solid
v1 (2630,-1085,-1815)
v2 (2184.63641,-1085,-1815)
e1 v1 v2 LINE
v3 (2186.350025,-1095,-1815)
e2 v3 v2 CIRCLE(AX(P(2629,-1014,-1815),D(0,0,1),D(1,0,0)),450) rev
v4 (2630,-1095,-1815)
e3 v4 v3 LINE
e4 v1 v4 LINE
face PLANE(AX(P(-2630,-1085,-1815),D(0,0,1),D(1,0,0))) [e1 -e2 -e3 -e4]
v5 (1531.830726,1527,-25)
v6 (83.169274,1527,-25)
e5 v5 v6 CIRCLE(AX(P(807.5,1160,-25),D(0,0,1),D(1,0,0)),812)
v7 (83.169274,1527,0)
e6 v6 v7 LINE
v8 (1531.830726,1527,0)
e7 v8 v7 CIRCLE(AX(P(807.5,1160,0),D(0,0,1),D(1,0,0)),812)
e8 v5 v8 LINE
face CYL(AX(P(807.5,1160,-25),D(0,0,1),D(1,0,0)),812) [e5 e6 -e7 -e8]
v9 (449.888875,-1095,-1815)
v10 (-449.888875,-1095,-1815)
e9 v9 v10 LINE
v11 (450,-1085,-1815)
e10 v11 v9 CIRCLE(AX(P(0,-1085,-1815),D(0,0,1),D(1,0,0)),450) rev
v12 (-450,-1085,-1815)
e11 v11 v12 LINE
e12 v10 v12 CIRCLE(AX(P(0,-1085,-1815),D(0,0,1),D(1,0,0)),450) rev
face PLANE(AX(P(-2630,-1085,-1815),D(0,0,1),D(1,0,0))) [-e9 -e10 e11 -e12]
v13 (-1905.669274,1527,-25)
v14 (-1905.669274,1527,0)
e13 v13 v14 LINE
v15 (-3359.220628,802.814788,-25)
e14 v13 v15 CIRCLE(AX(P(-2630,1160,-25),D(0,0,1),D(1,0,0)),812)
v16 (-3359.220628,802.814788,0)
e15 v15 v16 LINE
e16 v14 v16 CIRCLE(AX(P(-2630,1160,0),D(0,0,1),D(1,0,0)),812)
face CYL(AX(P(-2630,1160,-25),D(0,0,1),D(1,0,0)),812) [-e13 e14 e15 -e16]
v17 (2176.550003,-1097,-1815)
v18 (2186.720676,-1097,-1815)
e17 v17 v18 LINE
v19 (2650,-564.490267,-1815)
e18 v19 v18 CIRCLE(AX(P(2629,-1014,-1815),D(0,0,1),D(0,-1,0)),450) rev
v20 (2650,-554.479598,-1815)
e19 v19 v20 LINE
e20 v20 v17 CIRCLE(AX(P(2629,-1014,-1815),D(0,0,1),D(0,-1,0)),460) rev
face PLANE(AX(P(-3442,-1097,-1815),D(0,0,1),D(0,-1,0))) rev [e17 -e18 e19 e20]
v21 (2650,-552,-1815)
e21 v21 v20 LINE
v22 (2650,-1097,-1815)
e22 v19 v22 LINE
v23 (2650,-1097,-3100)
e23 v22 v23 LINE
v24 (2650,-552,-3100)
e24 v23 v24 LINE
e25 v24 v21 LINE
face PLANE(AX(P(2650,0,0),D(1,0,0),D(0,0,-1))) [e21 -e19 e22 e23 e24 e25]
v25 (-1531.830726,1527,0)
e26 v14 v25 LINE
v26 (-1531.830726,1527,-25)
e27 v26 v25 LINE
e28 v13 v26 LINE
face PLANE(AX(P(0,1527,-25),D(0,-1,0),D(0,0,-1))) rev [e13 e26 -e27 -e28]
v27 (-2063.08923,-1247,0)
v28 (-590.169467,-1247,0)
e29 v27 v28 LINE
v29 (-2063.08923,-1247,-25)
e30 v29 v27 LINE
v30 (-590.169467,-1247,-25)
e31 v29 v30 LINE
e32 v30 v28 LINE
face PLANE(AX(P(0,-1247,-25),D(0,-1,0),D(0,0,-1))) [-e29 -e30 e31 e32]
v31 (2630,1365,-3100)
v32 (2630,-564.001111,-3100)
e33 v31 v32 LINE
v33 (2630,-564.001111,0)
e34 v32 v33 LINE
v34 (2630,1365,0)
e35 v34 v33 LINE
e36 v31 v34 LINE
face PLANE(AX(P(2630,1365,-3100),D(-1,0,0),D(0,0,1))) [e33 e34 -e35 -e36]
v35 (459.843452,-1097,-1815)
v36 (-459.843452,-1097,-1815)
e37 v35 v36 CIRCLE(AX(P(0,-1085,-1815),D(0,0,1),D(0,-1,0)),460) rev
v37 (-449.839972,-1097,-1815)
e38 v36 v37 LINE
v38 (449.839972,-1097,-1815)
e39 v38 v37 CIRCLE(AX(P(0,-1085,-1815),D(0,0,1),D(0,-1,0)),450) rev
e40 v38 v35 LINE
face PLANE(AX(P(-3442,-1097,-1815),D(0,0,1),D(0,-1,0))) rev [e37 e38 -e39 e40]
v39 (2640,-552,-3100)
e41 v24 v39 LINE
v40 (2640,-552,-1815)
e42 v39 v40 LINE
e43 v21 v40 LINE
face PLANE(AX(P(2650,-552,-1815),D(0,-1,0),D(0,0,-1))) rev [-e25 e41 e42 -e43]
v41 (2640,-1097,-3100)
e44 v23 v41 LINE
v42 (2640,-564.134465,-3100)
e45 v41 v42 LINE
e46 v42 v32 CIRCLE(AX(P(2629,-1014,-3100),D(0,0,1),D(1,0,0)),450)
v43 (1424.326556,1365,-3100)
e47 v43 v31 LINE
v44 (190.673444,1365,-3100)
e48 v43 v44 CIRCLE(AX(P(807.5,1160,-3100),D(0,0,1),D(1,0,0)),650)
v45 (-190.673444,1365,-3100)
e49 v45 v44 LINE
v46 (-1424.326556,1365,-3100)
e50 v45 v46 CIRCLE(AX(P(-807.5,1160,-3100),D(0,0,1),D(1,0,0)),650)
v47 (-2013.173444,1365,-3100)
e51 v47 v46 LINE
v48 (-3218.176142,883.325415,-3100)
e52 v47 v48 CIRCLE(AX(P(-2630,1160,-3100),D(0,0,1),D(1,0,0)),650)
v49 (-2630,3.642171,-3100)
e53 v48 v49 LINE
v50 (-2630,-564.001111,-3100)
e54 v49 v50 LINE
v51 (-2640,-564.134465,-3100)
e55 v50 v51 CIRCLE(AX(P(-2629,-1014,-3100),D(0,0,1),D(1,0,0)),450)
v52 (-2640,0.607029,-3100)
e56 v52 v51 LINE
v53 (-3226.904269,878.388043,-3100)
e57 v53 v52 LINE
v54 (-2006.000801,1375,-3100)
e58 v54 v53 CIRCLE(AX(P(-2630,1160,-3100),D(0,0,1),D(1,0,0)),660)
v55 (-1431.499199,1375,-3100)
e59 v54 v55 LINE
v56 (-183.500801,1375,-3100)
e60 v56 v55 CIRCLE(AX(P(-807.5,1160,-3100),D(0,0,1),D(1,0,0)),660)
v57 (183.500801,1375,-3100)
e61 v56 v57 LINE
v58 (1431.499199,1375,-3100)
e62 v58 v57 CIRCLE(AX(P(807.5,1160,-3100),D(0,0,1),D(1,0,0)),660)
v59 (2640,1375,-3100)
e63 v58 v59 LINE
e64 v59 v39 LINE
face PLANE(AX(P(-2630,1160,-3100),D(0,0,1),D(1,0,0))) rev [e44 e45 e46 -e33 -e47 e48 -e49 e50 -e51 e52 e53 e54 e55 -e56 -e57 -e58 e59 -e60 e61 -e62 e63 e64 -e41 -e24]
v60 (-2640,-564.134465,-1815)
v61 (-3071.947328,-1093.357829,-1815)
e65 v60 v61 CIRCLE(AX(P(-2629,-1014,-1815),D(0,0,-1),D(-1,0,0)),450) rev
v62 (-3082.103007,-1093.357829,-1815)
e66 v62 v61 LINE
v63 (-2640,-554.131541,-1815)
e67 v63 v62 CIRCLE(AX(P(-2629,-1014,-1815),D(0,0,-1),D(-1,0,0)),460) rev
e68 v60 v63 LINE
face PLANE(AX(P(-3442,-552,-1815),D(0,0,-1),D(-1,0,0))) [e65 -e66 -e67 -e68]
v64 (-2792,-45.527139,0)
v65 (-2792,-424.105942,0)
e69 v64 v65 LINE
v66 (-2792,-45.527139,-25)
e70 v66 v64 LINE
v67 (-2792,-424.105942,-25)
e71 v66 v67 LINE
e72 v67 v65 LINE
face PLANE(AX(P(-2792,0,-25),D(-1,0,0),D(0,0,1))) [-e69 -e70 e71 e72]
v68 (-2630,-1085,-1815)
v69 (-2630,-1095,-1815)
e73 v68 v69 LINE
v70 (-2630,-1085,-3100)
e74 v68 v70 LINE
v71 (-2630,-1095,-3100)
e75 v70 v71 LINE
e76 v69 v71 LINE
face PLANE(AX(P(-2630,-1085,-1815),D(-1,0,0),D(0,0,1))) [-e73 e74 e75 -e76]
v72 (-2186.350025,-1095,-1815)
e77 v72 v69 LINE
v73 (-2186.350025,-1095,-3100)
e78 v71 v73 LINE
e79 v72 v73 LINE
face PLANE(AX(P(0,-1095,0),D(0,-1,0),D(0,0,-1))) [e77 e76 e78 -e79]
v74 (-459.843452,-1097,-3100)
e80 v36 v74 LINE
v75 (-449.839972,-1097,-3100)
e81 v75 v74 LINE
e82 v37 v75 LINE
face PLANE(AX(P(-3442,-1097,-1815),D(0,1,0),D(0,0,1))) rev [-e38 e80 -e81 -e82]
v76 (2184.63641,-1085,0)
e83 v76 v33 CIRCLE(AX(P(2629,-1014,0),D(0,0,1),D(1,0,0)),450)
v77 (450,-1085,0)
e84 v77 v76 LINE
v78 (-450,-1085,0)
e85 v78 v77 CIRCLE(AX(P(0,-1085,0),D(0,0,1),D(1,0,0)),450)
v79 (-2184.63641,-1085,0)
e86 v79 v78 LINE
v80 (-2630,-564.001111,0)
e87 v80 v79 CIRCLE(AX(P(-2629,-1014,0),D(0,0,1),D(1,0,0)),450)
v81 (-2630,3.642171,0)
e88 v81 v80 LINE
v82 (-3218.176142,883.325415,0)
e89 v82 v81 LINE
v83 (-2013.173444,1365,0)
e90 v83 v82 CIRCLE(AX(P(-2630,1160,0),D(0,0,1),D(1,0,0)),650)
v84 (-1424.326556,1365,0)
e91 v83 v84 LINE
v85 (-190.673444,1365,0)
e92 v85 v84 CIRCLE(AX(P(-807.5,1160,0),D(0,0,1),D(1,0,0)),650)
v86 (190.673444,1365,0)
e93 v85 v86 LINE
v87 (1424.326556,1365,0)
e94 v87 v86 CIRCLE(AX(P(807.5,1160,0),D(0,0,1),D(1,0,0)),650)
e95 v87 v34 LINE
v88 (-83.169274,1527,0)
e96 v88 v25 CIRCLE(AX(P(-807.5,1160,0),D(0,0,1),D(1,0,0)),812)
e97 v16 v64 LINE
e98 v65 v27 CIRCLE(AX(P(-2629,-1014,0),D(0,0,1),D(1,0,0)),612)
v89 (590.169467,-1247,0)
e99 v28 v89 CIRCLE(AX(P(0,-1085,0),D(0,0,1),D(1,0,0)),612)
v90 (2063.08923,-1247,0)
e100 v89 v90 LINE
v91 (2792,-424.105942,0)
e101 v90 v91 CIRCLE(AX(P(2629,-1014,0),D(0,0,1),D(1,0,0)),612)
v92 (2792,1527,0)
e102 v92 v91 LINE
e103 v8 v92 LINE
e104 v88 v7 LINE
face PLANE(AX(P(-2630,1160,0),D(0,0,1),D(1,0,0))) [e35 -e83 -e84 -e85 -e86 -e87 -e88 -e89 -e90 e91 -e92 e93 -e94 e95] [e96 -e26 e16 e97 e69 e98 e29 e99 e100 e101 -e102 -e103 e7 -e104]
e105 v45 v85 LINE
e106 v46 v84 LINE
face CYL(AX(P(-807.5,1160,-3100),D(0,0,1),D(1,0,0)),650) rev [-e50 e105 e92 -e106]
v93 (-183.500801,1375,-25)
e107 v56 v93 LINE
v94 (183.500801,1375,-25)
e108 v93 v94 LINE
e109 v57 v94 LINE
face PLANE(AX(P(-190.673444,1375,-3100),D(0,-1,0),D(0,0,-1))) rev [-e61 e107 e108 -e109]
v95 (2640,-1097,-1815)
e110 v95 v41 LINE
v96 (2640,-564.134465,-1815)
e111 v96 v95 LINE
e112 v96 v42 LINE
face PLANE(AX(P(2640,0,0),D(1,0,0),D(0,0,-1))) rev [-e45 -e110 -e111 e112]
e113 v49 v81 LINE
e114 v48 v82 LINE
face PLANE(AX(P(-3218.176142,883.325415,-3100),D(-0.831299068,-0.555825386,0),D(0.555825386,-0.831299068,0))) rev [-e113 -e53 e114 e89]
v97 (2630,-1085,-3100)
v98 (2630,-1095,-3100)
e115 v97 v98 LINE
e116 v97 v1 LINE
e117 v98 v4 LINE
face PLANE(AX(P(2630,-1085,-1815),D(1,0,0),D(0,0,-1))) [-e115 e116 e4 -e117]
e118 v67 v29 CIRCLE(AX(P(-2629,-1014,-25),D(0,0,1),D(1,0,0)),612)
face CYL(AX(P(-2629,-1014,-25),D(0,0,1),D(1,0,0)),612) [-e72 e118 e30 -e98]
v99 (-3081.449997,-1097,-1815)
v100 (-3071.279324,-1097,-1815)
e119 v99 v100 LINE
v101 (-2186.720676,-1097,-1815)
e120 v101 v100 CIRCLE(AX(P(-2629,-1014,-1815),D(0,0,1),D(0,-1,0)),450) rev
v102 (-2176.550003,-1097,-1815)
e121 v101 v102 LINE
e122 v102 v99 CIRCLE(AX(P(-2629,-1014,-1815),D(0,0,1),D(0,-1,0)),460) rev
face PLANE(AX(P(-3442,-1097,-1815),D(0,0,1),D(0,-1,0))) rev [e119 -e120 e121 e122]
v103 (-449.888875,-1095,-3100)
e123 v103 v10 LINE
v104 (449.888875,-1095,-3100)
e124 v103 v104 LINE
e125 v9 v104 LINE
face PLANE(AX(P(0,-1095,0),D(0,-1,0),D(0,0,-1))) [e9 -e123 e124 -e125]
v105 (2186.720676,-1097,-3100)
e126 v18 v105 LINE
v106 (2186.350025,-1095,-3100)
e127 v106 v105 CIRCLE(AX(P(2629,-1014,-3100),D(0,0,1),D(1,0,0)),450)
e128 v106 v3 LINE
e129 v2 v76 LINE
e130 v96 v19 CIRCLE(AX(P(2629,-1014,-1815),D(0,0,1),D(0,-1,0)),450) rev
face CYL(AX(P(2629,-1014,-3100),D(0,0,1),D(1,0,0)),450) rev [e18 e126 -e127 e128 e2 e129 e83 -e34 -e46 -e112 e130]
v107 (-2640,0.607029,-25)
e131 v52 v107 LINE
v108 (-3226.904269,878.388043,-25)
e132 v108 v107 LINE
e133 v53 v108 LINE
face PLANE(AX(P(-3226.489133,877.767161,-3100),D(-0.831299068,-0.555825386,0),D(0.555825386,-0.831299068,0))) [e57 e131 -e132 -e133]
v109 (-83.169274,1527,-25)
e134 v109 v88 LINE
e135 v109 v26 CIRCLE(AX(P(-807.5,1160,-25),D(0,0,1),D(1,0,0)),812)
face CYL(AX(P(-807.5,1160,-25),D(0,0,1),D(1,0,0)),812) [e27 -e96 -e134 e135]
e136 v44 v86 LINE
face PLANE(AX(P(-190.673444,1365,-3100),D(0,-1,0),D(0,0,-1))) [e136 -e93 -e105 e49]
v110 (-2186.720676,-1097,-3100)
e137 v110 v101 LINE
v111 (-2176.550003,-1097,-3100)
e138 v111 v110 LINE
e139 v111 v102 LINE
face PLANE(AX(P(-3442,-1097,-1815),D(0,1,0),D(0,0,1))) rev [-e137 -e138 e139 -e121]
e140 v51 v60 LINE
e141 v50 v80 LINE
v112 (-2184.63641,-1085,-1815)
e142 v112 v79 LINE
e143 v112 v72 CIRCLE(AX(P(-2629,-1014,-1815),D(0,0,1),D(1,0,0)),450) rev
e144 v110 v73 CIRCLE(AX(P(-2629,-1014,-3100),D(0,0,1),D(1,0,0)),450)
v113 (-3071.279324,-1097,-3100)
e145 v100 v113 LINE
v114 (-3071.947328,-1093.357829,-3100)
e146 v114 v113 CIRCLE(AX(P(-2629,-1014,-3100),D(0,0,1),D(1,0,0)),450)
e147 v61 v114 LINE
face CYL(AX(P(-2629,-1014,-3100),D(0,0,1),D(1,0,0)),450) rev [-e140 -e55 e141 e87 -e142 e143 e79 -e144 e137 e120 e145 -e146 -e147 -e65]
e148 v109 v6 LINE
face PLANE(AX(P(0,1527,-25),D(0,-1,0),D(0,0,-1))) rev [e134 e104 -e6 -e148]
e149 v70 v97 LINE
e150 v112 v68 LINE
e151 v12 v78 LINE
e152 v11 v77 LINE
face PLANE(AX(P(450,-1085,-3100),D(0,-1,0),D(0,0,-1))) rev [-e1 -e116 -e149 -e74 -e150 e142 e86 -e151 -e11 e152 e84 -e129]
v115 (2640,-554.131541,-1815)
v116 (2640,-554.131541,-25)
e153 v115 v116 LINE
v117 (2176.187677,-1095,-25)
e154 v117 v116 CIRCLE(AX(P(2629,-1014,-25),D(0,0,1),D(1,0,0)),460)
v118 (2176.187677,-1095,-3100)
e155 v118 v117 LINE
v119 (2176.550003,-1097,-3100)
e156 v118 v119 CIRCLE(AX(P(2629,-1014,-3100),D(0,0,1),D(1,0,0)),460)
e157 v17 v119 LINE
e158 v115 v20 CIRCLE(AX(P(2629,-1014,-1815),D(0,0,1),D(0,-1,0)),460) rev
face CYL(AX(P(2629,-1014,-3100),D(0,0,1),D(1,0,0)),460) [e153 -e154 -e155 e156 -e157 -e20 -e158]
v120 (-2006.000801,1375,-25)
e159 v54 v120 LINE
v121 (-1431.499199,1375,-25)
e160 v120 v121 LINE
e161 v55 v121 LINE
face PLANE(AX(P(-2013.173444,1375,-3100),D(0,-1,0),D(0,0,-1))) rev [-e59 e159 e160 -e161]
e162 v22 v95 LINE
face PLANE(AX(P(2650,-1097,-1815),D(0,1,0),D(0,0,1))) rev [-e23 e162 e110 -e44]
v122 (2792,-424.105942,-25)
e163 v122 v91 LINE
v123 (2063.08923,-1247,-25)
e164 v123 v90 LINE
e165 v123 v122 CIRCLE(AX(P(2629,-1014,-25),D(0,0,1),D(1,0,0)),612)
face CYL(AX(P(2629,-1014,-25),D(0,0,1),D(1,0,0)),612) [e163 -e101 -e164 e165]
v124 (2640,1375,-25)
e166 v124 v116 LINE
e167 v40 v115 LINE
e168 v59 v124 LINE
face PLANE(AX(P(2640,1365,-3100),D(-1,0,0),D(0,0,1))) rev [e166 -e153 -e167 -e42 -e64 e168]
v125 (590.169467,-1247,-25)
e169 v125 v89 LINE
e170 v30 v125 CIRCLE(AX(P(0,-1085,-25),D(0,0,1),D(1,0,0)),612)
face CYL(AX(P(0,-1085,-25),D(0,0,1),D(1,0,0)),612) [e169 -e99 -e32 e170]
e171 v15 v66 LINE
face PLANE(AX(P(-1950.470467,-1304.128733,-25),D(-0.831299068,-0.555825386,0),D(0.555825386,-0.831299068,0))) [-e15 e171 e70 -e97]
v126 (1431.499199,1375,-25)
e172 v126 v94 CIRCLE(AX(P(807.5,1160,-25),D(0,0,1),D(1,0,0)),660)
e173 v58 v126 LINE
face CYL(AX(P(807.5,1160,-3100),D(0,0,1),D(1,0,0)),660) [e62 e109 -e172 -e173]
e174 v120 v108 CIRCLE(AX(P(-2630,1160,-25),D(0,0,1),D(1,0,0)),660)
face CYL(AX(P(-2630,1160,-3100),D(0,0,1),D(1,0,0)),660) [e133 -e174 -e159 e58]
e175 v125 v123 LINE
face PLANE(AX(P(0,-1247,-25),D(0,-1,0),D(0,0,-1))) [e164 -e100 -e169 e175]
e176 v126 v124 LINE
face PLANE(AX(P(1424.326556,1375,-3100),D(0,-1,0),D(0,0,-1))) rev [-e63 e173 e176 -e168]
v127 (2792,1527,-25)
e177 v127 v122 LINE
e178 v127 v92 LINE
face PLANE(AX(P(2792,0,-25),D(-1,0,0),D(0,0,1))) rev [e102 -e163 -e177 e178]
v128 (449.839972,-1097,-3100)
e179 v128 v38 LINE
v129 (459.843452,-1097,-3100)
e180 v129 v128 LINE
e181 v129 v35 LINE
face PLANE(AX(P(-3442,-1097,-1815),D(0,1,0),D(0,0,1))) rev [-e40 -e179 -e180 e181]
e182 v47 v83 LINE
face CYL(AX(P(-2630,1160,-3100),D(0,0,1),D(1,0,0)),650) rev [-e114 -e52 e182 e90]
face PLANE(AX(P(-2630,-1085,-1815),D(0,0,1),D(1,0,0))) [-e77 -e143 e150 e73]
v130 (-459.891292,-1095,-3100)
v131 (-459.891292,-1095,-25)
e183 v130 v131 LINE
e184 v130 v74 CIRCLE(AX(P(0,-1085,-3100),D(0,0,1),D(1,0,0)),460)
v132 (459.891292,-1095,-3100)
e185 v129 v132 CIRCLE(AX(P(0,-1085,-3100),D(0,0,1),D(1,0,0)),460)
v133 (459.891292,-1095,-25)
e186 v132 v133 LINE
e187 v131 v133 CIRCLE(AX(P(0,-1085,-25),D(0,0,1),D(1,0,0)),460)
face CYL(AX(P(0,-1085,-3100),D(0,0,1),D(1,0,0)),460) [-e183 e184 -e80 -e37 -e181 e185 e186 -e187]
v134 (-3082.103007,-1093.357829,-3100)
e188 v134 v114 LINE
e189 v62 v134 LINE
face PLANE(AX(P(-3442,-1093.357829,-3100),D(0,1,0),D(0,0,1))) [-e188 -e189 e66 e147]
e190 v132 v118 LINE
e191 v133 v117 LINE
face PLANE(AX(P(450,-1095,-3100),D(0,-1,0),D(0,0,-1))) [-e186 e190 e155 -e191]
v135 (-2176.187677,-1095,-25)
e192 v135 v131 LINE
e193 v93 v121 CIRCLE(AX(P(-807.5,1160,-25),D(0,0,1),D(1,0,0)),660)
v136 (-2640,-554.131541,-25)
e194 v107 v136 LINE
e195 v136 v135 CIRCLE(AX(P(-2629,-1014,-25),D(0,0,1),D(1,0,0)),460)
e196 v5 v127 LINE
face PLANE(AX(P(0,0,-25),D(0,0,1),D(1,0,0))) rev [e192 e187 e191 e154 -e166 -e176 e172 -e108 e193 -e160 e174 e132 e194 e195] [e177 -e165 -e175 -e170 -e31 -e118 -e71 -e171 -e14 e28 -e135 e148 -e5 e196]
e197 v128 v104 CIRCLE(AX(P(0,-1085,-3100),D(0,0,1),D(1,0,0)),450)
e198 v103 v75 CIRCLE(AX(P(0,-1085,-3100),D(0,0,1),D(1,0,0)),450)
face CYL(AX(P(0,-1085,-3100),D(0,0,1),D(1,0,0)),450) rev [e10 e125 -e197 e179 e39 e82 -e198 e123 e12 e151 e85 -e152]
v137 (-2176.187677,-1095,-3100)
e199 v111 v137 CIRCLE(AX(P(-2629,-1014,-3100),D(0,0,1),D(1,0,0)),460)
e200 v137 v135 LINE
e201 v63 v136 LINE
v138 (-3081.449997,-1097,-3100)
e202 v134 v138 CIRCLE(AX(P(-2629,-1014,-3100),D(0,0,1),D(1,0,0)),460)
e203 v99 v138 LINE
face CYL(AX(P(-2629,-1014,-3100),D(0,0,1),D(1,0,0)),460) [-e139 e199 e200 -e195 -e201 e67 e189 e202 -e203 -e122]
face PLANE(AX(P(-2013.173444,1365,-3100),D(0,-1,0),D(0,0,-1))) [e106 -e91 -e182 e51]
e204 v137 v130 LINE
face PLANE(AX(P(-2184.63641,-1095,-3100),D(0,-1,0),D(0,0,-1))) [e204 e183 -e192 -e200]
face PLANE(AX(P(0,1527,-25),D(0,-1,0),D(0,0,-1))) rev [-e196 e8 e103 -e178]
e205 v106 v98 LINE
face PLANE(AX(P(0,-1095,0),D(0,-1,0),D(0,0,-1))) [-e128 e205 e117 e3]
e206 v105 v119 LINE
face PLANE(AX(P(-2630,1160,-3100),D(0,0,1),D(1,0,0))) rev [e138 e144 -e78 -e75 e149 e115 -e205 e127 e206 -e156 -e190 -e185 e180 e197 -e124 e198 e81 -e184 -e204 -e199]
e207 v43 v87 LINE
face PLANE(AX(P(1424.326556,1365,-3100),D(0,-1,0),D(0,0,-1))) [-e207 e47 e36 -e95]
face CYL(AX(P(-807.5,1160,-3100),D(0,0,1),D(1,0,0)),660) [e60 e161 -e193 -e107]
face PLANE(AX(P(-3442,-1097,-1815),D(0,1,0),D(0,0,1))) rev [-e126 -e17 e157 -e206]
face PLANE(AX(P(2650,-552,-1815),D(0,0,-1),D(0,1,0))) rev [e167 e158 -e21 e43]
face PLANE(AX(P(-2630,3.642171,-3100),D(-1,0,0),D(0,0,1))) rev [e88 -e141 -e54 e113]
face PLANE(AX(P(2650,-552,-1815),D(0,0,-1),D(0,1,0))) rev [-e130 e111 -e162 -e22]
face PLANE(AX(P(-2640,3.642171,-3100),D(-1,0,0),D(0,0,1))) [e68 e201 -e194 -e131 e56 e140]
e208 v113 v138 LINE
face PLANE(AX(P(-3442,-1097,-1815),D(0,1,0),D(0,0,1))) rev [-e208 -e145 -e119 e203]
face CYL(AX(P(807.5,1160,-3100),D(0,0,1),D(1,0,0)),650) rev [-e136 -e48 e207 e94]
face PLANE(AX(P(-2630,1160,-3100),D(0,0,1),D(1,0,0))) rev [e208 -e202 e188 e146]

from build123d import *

# Parameters (mm, degrees)
EXTRUDE_THIN2_DEPTH     = 3100
BOSS_EXTRUDE2_DEPTH     = 25
CUT_EXTRUDE1_DEPTH      = 7106.596948885
CUT_EXTRUDE1_DEPTH_BACK = 7106.596948885
SKETCH7_W               = 1405.301830193
SKETCH7_H               = 450
SKETCH8_W               = 5260
SKETCH8_H               = 1285
BOSS_EXTRUDE3_DEPTH     = 10
CUT_EXTRUDE2_OUTLINE_W  = 1285
CUT_EXTRUDE2_OUTLINE_H  = 545
CUT_EXTRUDE2_DEPTH      = 449
SKETCH10_W              = 1285
SKETCH10_H              = 545
BOSS_EXTRUDE4_DEPTH     = 10
CUT_EXTRUDE3_OUTLINE_W  = 1285
CUT_EXTRUDE3_OUTLINE_H  = 541.35782885
CUT_EXTRUDE3_DEPTH      = 449


# Read off the part's stored shape, not the designer's step: Cut-Extrude2, Cut-Extrude3
with BuildPart() as part:
    # body → Extrude-Thin2 (new body)
    with BuildSketch(Plane.XY):
        with BuildLine():
            Line((-3226.904268523, 878.38804319), (-2640, 0.607028525))
            Line((-2640, 0.607028525), (-2640, -554.131540547))
            ThreePointArc((-2640, -554.131540547), (-2978.190785718, -1313.44247389), (-2176.187676846, -1095))
            Line((-2176.187676846, -1095), (-459.891291503, -1095))
            ThreePointArc((-459.891291503, -1095), (0, -1545), (459.891291503, -1095))
            Line((459.891291503, -1095), (2176.187676846, -1095))
            ThreePointArc((2176.187676846, -1095), (2978.190785718, -1313.44247389), (2640, -554.131540547))
            Line((2640, -554.131540547), (2640, 1375))
            Line((2640, 1375), (1431.499198717, 1375))
            ThreePointArc((1431.499198717, 1375), (807.5, 1820), (183.500801283, 1375))
            Line((183.500801283, 1375), (-183.500801283, 1375))
            ThreePointArc((-183.500801283, 1375), (-807.5, 1820), (-1431.499198717, 1375))
            Line((-1431.499198717, 1375), (-2006.000801283, 1375))
            ThreePointArc((-2006.000801283, 1375), (-2878.675275655, 1771.359638247), (-3226.904268523, 878.38804319))
        make_face()
        with BuildLine():
            Line((-3218.17614189, 883.325414771), (-2630, 3.64217115))
            Line((-2630, 3.64217115), (-2630, -564.001111112))
            ThreePointArc((-2630, -564.001111112), (-2971.056689396, -1306.399078725), (-2184.636410132, -1085))
            Line((-2184.636410132, -1085), (-450, -1085))
            ThreePointArc((-450, -1085), (0, -1535), (450, -1085))
            Line((450, -1085), (2184.636410132, -1085))
            ThreePointArc((2184.636410132, -1085), (2971.056689396, -1306.399078725), (2630, -564.001111112))
            Line((2630, -564.001111112), (2630, 1365))
            Line((2630, 1365), (1424.326555849, 1365))
            ThreePointArc((1424.326555849, 1365), (807.5, 1810), (190.673444151, 1365))
            Line((190.673444151, 1365), (-190.673444151, 1365))
            ThreePointArc((-190.673444151, 1365), (-807.5, 1810), (-1424.326555849, 1365))
            Line((-1424.326555849, 1365), (-2013.173444151, 1365))
            ThreePointArc((-2013.173444151, 1365), (-2871.262954199, 1763.566224147), (-3218.17614189, 883.325414771))
        make_face(mode=Mode.SUBTRACT)
    extrude(amount=-EXTRUDE_THIN2_DEPTH)

    # curb → Boss-Extrude2 (add)
    with BuildSketch(Plane.XY):
        with BuildLine():
            Line((-83.169274433, 1527), (83.169274433, 1527))
            ThreePointArc((83.169274433, 1527), (807.5, 1972), (1531.830725567, 1527))
            Line((1531.830725567, 1527), (2792, 1527))
            Line((2792, 1527), (2792, -424.105941715))
            ThreePointArc((2792, -424.105941715), (3087.118903787, -1419.796833395), (2063.089229648, -1247))
            Line((2063.089229648, -1247), (590.169467187, -1247))
            ThreePointArc((590.169467187, -1247), (0, -1697), (-590.169467187, -1247))
            Line((-590.169467187, -1247), (-2063.089229648, -1247))
            ThreePointArc((-2063.089229648, -1247), (-3087.118903787, -1419.796833395), (-2792, -424.105941715))
            Line((-2792, -424.105941715), (-2792, -45.527139379))
            Line((-2792, -45.527139379), (-3359.22062819, 802.81478835))
            ThreePointArc((-3359.22062819, 802.81478835), (-2992.100860231, 1886.792244744), (-1905.669274433, 1527))
            Line((-1905.669274433, 1527), (-1531.830725567, 1527))
            ThreePointArc((-1531.830725567, 1527), (-807.5, 1972), (-83.169274433, 1527))
        make_face()
        with BuildLine():
            ThreePointArc((-2006.000801283, 1375), (-2878.675275655, 1771.359638247), (-3226.904268523, 878.38804319))
            Line((-3226.904268523, 878.38804319), (-2640, 0.607028525))
            Line((-2640, 0.607028525), (-2640, -554.131540547))
            ThreePointArc((-2640, -554.131540547), (-2978.190785718, -1313.44247389), (-2176.187676846, -1095))
            Line((-2176.187676846, -1095), (-459.891291503, -1095))
            ThreePointArc((-459.891291503, -1095), (0, -1545), (459.891291503, -1095))
            Line((459.891291503, -1095), (2176.187676846, -1095))
            ThreePointArc((2176.187676846, -1095), (2978.190785718, -1313.44247389), (2640, -554.131540547))
            Line((2640, -554.131540547), (2640, 1375))
            Line((2640, 1375), (1431.499198717, 1375))
            ThreePointArc((1431.499198717, 1375), (807.5, 1820), (183.500801283, 1375))
            Line((183.500801283, 1375), (-183.500801283, 1375))
            ThreePointArc((-183.500801283, 1375), (-807.5, 1820), (-1431.499198717, 1375))
            Line((-1431.499198717, 1375), (-2006.000801283, 1375))
        make_face(mode=Mode.SUBTRACT)
    extrude(amount=-BOSS_EXTRUDE2_DEPTH)

    # Sketch7 → Cut-Extrude1 (cut, two sides: drawn at the far end of the back side and taken through both)
    with BuildSketch(Plane(origin=(2640, 0, 0), x_dir=(0, 0, -1), z_dir=(1, 0, 0)).offset(-CUT_EXTRUDE1_DEPTH_BACK)):
        with Locations((2517.650915097, -1322)):
            Rectangle(SKETCH7_W, SKETCH7_H)
    extrude(amount=CUT_EXTRUDE1_DEPTH + CUT_EXTRUDE1_DEPTH_BACK, mode=Mode.SUBTRACT)

    # Sketch8 → Boss-Extrude3 (add)
    with BuildSketch(Plane.XZ.offset(1095)):
        with Locations((0, -2457.5)):
            Rectangle(SKETCH8_W, SKETCH8_H)
    extrude(amount=-BOSS_EXTRUDE3_DEPTH)

    # Cut-Extrude2 outline → Cut-Extrude2 (cut)
    with BuildSketch(Plane(origin=(2640, 0, 0), x_dir=(0, 0, -1), z_dir=(1, 0, 0))):
        with Locations((2457.5, -824.5)):
            Rectangle(CUT_EXTRUDE2_OUTLINE_W, CUT_EXTRUDE2_OUTLINE_H)
    extrude(amount=CUT_EXTRUDE2_DEPTH, mode=Mode.SUBTRACT)

    # Sketch10 → Boss-Extrude4 (add)
    with BuildSketch(Plane(origin=(2640, 0, 0), x_dir=(0, 0, -1), z_dir=(1, 0, 0))):
        with Locations((2457.5, -824.5)):
            Rectangle(SKETCH10_W, SKETCH10_H)
    extrude(amount=BOSS_EXTRUDE4_DEPTH)

    # Cut-Extrude3 outline → Cut-Extrude3 (cut)
    with BuildSketch(Plane.ZY.offset(2640)):
        with Locations((-2457.5, -822.678914425)):
            Rectangle(CUT_EXTRUDE3_OUTLINE_W, CUT_EXTRUDE3_OUTLINE_H)
    extrude(amount=CUT_EXTRUDE3_DEPTH, mode=Mode.SUBTRACT)


solid = part.part
